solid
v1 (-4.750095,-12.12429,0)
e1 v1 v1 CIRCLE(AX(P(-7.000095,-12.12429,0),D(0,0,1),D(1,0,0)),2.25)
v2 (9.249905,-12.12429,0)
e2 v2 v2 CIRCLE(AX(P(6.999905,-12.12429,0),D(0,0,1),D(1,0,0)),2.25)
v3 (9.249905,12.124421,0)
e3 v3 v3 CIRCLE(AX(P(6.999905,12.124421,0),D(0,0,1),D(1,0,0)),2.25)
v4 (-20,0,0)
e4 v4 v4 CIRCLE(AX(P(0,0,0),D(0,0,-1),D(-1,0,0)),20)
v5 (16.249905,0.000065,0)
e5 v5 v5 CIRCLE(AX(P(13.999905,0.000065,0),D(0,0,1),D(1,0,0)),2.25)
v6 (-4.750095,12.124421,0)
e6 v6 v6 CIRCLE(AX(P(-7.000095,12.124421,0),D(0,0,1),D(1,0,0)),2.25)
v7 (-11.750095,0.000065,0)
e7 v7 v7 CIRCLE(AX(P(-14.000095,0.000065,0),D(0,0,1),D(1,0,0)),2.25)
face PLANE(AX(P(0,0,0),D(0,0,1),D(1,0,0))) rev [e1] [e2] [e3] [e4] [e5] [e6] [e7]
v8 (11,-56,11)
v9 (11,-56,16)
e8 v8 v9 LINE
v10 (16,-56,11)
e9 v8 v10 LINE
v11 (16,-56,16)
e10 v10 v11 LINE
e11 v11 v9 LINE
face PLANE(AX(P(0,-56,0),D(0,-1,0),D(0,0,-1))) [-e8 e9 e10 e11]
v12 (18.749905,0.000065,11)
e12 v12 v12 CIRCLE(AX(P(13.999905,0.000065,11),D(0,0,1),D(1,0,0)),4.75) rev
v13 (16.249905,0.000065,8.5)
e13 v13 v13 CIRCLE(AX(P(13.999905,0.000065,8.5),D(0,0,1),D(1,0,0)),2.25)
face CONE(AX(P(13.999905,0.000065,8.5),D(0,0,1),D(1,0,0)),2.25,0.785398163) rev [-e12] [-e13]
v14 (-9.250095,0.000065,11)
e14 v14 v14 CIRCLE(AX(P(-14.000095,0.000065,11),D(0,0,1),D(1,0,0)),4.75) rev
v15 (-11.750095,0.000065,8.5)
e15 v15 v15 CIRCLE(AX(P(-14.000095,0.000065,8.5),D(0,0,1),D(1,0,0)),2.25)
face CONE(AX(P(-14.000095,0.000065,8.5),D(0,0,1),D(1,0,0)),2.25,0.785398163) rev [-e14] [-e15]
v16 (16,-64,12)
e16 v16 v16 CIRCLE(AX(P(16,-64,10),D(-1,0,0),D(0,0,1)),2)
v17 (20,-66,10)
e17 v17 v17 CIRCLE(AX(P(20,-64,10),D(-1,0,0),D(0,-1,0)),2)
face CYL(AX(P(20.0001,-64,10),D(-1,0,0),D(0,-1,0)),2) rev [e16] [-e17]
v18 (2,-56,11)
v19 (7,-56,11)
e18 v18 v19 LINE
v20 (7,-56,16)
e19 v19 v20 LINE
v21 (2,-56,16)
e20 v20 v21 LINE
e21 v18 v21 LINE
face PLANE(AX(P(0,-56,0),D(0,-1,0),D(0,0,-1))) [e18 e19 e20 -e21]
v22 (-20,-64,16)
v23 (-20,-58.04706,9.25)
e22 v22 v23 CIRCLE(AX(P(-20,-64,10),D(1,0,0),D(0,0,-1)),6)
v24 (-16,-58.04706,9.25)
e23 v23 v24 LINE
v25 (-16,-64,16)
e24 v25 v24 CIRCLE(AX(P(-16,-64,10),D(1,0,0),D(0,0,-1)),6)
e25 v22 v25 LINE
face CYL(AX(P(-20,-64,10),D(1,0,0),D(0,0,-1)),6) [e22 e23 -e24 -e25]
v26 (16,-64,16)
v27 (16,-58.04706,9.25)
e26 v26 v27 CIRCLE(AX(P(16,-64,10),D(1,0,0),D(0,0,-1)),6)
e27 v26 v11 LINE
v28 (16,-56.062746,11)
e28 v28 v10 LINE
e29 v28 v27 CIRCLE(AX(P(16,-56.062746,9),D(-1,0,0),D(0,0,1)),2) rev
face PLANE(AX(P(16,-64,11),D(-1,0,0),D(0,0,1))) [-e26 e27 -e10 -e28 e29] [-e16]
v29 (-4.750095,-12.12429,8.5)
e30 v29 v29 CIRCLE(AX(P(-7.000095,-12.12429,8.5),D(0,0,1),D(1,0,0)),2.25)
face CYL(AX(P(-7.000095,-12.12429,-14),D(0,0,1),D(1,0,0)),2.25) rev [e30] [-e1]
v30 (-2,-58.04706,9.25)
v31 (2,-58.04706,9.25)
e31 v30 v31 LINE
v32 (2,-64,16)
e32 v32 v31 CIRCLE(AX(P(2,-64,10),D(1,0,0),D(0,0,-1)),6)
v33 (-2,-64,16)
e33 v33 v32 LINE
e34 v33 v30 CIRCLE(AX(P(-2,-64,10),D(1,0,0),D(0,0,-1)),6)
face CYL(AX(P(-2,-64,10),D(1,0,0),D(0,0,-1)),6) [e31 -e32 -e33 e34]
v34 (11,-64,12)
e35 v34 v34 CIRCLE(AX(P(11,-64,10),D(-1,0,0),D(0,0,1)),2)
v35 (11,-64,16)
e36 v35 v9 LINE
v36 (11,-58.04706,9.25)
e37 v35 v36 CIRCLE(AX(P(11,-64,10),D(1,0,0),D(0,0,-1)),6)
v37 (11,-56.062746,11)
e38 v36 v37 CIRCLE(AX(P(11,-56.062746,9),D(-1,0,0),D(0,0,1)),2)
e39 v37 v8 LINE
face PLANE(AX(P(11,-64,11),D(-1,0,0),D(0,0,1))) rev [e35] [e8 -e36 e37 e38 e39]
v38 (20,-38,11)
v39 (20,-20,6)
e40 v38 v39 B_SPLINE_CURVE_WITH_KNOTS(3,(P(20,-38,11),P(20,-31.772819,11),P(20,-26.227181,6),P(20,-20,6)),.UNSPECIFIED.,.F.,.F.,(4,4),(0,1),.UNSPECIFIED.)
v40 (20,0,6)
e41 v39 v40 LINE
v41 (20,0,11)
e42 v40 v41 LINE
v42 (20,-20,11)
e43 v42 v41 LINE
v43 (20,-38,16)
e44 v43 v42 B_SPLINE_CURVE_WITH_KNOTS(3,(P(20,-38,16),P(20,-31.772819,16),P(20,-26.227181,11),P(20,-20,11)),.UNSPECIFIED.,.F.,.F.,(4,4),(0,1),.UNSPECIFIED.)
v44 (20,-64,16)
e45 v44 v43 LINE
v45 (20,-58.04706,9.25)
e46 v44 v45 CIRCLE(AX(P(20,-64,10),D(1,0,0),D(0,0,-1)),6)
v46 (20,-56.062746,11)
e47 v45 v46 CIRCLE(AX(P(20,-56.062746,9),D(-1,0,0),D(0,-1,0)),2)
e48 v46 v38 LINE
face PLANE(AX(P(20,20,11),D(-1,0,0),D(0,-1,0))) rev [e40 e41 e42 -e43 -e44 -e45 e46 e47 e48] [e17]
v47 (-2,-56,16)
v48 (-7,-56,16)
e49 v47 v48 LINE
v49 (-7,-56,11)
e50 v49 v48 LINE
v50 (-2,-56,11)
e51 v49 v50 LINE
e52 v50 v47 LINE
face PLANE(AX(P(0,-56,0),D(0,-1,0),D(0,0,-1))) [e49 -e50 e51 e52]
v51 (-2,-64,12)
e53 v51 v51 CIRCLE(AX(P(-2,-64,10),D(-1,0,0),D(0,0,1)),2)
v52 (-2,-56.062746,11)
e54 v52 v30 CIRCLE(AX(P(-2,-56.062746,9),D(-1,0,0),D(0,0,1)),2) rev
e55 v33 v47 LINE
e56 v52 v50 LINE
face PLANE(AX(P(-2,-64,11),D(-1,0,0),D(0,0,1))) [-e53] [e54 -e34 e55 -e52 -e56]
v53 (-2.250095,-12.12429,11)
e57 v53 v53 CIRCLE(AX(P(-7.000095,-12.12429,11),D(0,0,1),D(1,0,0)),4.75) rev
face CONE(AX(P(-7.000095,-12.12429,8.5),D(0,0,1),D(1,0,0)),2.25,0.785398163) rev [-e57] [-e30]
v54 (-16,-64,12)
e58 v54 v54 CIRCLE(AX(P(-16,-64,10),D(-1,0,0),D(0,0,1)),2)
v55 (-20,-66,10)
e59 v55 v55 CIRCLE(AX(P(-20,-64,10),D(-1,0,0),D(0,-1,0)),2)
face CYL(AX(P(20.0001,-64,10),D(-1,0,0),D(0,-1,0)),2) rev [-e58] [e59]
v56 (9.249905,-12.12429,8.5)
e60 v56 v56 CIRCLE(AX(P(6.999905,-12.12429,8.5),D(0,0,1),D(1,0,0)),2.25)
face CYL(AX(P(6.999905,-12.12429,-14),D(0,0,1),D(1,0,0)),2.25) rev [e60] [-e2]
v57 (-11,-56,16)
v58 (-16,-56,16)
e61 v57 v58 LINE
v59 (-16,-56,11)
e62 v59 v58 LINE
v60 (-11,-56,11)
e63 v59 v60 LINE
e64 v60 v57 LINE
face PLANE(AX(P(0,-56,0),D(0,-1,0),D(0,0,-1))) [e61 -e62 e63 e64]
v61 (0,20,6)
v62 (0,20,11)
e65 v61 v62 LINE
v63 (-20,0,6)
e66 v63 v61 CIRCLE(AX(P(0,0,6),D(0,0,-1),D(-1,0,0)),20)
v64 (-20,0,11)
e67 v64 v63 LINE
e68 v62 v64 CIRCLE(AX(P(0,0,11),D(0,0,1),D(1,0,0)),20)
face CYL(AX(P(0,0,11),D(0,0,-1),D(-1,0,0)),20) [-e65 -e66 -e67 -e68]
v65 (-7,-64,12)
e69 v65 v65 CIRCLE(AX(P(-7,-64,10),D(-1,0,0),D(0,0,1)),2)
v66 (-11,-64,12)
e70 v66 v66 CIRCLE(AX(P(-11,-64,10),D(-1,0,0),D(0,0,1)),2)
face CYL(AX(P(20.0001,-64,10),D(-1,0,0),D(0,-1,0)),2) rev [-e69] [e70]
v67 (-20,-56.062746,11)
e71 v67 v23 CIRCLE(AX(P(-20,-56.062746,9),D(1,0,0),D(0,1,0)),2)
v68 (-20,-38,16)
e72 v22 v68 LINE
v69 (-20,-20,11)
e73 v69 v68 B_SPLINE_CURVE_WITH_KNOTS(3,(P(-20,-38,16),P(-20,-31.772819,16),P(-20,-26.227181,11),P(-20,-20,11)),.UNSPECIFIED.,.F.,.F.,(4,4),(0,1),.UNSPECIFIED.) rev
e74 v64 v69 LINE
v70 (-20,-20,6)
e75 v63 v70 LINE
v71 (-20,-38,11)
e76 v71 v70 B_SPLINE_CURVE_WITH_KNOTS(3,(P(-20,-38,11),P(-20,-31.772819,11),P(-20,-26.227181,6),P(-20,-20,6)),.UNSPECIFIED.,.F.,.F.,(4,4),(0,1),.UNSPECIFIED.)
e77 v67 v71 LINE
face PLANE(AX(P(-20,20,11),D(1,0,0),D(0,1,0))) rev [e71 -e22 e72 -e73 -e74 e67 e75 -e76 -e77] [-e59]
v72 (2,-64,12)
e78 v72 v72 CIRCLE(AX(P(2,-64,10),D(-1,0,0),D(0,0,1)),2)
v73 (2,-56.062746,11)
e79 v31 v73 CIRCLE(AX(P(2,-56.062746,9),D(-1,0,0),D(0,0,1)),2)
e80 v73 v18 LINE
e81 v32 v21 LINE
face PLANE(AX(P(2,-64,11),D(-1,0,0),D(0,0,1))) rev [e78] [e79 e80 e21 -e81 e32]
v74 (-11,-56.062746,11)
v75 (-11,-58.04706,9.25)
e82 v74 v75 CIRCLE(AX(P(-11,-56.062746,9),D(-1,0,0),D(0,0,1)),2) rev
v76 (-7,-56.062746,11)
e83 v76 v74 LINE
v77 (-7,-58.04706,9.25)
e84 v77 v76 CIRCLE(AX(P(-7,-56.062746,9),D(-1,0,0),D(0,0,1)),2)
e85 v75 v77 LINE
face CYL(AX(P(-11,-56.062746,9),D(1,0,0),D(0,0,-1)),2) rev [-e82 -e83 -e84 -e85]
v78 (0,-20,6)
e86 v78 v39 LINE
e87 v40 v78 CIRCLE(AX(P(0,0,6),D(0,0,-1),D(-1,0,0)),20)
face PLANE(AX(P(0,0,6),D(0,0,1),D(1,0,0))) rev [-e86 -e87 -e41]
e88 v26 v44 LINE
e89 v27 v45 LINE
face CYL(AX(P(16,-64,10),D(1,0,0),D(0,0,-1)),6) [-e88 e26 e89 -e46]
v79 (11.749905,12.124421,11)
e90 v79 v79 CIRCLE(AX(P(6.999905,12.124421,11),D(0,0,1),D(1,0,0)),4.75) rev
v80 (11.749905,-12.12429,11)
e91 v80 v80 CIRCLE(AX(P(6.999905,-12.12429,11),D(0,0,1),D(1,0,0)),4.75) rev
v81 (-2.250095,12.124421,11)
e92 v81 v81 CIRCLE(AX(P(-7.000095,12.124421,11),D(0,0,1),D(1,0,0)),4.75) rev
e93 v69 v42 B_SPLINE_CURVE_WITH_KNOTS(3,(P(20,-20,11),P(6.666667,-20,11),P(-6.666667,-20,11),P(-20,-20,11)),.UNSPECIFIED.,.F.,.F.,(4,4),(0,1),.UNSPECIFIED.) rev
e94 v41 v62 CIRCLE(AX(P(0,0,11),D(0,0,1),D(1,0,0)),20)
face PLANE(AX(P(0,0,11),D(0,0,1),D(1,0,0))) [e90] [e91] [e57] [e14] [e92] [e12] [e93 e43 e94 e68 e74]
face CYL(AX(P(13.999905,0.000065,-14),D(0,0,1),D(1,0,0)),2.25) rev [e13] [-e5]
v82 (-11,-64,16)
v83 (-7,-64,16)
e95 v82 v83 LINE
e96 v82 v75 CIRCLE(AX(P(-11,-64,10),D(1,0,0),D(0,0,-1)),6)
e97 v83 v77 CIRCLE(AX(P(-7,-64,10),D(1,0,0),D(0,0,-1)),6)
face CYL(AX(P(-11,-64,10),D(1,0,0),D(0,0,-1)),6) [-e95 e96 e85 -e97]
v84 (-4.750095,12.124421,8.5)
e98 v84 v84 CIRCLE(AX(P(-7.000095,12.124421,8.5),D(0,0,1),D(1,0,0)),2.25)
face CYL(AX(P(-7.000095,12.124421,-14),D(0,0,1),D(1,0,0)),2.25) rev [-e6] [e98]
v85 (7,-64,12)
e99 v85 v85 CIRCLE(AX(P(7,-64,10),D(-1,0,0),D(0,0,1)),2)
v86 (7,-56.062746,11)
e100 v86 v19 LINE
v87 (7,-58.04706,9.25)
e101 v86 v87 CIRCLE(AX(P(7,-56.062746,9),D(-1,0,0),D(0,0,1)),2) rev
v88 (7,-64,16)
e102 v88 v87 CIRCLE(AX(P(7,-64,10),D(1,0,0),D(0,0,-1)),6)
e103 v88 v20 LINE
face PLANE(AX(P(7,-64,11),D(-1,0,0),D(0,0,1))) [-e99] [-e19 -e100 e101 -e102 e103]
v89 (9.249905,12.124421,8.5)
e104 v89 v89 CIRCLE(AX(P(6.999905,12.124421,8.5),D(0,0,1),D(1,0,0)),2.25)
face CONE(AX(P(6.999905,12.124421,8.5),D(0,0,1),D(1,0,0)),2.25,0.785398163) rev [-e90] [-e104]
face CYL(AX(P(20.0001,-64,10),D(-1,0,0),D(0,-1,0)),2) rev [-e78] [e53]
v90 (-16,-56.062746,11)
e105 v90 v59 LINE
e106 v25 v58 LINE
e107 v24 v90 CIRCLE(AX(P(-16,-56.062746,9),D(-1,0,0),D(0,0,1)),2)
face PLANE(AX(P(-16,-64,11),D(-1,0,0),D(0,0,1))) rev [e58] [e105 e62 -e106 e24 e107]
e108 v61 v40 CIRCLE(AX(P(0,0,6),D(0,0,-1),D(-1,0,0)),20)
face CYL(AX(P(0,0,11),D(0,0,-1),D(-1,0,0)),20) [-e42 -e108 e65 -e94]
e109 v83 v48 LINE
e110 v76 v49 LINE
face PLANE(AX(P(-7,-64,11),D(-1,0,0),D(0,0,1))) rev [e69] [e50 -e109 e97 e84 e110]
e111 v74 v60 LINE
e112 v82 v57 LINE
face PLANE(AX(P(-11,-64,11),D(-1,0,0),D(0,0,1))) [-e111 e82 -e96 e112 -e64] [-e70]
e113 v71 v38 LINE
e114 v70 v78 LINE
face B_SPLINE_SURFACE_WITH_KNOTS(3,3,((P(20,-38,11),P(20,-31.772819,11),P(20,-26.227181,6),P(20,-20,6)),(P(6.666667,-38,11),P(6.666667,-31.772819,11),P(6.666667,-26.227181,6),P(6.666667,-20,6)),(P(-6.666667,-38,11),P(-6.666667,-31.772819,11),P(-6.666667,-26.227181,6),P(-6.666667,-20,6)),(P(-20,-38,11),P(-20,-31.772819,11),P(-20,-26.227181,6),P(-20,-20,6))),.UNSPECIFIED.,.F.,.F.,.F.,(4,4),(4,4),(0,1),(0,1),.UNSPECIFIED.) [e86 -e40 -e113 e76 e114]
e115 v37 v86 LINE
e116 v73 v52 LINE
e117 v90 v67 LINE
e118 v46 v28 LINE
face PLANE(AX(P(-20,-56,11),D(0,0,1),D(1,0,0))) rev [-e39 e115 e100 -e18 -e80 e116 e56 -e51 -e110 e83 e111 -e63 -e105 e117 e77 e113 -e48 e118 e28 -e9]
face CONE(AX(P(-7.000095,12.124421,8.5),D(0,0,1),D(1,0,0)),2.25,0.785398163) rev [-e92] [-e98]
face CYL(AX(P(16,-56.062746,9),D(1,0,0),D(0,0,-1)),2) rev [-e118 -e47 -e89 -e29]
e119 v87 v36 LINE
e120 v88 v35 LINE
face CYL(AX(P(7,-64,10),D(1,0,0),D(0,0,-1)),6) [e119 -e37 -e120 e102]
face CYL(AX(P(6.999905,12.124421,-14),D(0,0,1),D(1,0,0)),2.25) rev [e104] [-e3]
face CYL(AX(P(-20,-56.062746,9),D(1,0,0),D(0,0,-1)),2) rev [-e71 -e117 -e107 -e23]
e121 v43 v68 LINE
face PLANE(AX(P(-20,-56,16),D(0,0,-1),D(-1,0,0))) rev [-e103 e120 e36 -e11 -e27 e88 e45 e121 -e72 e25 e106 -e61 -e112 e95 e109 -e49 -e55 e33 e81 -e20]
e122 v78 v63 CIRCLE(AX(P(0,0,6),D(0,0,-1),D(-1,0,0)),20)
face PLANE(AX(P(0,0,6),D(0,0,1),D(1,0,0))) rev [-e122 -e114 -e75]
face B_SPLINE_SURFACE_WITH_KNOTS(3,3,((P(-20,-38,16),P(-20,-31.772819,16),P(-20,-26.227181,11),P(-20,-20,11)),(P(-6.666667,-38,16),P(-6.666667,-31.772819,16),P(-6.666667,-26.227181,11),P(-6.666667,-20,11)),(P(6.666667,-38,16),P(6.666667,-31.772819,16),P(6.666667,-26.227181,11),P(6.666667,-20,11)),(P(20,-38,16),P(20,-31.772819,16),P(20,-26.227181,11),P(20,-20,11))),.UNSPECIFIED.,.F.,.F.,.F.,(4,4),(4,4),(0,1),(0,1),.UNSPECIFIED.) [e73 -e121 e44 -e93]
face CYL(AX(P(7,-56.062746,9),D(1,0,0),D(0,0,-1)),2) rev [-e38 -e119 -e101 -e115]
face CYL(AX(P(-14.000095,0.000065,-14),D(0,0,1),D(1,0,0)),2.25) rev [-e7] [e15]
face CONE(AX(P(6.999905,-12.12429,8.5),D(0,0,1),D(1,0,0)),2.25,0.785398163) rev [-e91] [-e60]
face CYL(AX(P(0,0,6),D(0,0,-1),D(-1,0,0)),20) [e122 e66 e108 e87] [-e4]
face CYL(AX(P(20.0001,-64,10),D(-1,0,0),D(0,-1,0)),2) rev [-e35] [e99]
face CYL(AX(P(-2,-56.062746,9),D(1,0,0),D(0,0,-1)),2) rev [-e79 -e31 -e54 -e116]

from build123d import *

# Parameters (mm, degrees)
SKETCH7_W           = 40
SKETCH7_H           = 40
BOSS_EXTRUDE1_DEPTH = 11
LOFT1_START         = -20
LOFT1_DEPTH         = 40
SKETCH16_W          = 49.026286786
SKETCH16_H          = 65.242270374
SKETCH16_R          = 20
CUT_EXTRUDE3_DEPTH  = 6
SKETCH17_W          = 40
SKETCH17_H          = 5
BOSS_EXTRUDE5_DEPTH = 18
SKETCH10_R          = 2.25
CUT_EXTRUDE1_DEPTH  = 25
SKETCH11_W          = 4
SKETCH11_H          = 5
BOSS_EXTRUDE3_DEPTH = 8
SKETCH14_R          = 6
BOSS_EXTRUDE4_DEPTH = 4
LPATTERN1_COUNT     = 5
LPATTERN1_PITCH     = 9
SKETCH15_R          = 2
CUT_EXTRUDE2_DEPTH  = 83.194890505
CHAMFER1_SIZE       = 2.5
FILLET2_R           = 2
FILLET3_R           = 20


# Read off the part's stored shape, not the designer's step: Loft1
with BuildPart() as part:
    # Sketch7 → Boss-Extrude1 (new body)
    with BuildSketch(Plane.XY):
        Rectangle(SKETCH7_W, SKETCH7_H)
    extrude(amount=BOSS_EXTRUDE1_DEPTH)

    # Loft1 outline → Loft1 (add)
    with BuildSketch(Plane.YZ.offset(LOFT1_START)):
        with BuildLine():
            add(Edge.make_bspline(
                [(-38, 16), (-31.772819436, 16), (-26.227180564, 11), (-20, 11)],
                knots=[0, 0, 0, 0, 1, 1, 1, 1], degree=3))
            Line((-38, 16), (-38, 11))
            add(Edge.make_bspline(
                [(-38, 11), (-31.772819436, 11), (-26.227180564, 6), (-20, 6)],
                knots=[0, 0, 0, 0, 1, 1, 1, 1], degree=3))
            Line((-20, 6), (-20, 11))
        make_face()
    extrude(amount=LOFT1_DEPTH)

    # Sketch16 → Cut-Extrude3 (cut)
    with BuildSketch(Plane(origin=(0, 0, 0), x_dir=(-1, 0, 0), z_dir=(0, 0, -1))):
        Rectangle(SKETCH16_W, SKETCH16_H)
        Circle(SKETCH16_R, mode=Mode.SUBTRACT)
    extrude(amount=-CUT_EXTRUDE3_DEPTH, mode=Mode.SUBTRACT)

    # Sketch17 → Boss-Extrude5 (add)
    with BuildSketch(Plane(origin=(0, -38, 0), x_dir=(-1, 0, 0), z_dir=(0, -1, 0))):
        with Locations((0, -13.5)):
            Rectangle(SKETCH17_W, SKETCH17_H)
    extrude(amount=BOSS_EXTRUDE5_DEPTH)

    # Sketch10 → Cut-Extrude1 (cut)
    with BuildSketch(Plane.XY.offset(11)):
        with Locations((-7.00009521, 12.124420806)):
            Circle(SKETCH10_R)
        with Locations((6.99990479, 12.124420806)):
            Circle(SKETCH10_R)
        with Locations((13.99990479, 6.5153e-05)):
            Circle(SKETCH10_R)
        with Locations((6.99990479, -12.1242905)):
            Circle(SKETCH10_R)
        with Locations((-7.00009521, -12.1242905)):
            Circle(SKETCH10_R)
        with Locations((-14.00009521, 6.5153e-05)):
            Circle(SKETCH10_R)
    extrude(amount=-CUT_EXTRUDE1_DEPTH, mode=Mode.SUBTRACT)

    # Sketch11 → Boss-Extrude3 (add)
    with BuildSketch(Plane(origin=(0, -56, -3.472963553), x_dir=(1, 0, 0), z_dir=(0, 1, 0))):
        with Locations((-18, -16.972963553)):
            Rectangle(SKETCH11_W, SKETCH11_H)
    boss_extrude3 = extrude(amount=-BOSS_EXTRUDE3_DEPTH)

    # Sketch14 → Boss-Extrude4 (add)
    with BuildSketch(Plane(origin=(-16, 0, 0), x_dir=(0, 0, -1), z_dir=(1, 0, 0))):
        with Locations((-10, -64)):
            Circle(SKETCH14_R)
    boss_extrude4 = extrude(amount=-BOSS_EXTRUDE4_DEPTH)

    # LPattern1: Boss-Extrude3, Boss-Extrude4 ×5
    with Locations(*[(i * LPATTERN1_PITCH, 0, 0) for i in range(1, LPATTERN1_COUNT)]):
        add(boss_extrude3)
        add(boss_extrude4)

    # Sketch15 → Cut-Extrude2 (cut, through all)
    with BuildSketch(Plane.ZY.offset(20)):
        with Locations(Location((10, -64, 0), (0, 0, 270))):
            Circle(SKETCH15_R)
    extrude(amount=-CUT_EXTRUDE2_DEPTH, mode=Mode.SUBTRACT)

    # Chamfer1
    chamfer1_edges = [part.edges().sort_by_distance(p)[0] for p in [
        (4.74990479, 12.124420806, 11),
        (-9.25009521, 12.124420806, 11),
        (-16.25009521, 6.5153e-05, 11),
        (-9.25009521, -12.1242905, 11),
        (4.74990479, -12.1242905, 11),
        (11.74990479, 6.5153e-05, 11),
    ]]
    chamfer(chamfer1_edges, length=CHAMFER1_SIZE)

    # Fillet2
    fillet2_edges = [part.edges().sort_by_distance(p)[0] for p in [
        (-18, -58.083920217, 11),
        (-9, -58.083920217, 11),
        (0, -58.083920217, 11),
        (9, -58.083920217, 11),
        (18, -58.083920217, 11),
    ]]
    fillet(fillet2_edges, radius=FILLET2_R)

    # Fillet3
    fillet3_edges = [part.edges().sort_by_distance(p)[0] for p in [
        (20, 20, 8.5),
        (-20, 20, 8.5),
    ]]
    fillet(fillet3_edges, radius=FILLET3_R - 0.0001)  # a hair under: the kernel refuses the full size


solid = part.part
